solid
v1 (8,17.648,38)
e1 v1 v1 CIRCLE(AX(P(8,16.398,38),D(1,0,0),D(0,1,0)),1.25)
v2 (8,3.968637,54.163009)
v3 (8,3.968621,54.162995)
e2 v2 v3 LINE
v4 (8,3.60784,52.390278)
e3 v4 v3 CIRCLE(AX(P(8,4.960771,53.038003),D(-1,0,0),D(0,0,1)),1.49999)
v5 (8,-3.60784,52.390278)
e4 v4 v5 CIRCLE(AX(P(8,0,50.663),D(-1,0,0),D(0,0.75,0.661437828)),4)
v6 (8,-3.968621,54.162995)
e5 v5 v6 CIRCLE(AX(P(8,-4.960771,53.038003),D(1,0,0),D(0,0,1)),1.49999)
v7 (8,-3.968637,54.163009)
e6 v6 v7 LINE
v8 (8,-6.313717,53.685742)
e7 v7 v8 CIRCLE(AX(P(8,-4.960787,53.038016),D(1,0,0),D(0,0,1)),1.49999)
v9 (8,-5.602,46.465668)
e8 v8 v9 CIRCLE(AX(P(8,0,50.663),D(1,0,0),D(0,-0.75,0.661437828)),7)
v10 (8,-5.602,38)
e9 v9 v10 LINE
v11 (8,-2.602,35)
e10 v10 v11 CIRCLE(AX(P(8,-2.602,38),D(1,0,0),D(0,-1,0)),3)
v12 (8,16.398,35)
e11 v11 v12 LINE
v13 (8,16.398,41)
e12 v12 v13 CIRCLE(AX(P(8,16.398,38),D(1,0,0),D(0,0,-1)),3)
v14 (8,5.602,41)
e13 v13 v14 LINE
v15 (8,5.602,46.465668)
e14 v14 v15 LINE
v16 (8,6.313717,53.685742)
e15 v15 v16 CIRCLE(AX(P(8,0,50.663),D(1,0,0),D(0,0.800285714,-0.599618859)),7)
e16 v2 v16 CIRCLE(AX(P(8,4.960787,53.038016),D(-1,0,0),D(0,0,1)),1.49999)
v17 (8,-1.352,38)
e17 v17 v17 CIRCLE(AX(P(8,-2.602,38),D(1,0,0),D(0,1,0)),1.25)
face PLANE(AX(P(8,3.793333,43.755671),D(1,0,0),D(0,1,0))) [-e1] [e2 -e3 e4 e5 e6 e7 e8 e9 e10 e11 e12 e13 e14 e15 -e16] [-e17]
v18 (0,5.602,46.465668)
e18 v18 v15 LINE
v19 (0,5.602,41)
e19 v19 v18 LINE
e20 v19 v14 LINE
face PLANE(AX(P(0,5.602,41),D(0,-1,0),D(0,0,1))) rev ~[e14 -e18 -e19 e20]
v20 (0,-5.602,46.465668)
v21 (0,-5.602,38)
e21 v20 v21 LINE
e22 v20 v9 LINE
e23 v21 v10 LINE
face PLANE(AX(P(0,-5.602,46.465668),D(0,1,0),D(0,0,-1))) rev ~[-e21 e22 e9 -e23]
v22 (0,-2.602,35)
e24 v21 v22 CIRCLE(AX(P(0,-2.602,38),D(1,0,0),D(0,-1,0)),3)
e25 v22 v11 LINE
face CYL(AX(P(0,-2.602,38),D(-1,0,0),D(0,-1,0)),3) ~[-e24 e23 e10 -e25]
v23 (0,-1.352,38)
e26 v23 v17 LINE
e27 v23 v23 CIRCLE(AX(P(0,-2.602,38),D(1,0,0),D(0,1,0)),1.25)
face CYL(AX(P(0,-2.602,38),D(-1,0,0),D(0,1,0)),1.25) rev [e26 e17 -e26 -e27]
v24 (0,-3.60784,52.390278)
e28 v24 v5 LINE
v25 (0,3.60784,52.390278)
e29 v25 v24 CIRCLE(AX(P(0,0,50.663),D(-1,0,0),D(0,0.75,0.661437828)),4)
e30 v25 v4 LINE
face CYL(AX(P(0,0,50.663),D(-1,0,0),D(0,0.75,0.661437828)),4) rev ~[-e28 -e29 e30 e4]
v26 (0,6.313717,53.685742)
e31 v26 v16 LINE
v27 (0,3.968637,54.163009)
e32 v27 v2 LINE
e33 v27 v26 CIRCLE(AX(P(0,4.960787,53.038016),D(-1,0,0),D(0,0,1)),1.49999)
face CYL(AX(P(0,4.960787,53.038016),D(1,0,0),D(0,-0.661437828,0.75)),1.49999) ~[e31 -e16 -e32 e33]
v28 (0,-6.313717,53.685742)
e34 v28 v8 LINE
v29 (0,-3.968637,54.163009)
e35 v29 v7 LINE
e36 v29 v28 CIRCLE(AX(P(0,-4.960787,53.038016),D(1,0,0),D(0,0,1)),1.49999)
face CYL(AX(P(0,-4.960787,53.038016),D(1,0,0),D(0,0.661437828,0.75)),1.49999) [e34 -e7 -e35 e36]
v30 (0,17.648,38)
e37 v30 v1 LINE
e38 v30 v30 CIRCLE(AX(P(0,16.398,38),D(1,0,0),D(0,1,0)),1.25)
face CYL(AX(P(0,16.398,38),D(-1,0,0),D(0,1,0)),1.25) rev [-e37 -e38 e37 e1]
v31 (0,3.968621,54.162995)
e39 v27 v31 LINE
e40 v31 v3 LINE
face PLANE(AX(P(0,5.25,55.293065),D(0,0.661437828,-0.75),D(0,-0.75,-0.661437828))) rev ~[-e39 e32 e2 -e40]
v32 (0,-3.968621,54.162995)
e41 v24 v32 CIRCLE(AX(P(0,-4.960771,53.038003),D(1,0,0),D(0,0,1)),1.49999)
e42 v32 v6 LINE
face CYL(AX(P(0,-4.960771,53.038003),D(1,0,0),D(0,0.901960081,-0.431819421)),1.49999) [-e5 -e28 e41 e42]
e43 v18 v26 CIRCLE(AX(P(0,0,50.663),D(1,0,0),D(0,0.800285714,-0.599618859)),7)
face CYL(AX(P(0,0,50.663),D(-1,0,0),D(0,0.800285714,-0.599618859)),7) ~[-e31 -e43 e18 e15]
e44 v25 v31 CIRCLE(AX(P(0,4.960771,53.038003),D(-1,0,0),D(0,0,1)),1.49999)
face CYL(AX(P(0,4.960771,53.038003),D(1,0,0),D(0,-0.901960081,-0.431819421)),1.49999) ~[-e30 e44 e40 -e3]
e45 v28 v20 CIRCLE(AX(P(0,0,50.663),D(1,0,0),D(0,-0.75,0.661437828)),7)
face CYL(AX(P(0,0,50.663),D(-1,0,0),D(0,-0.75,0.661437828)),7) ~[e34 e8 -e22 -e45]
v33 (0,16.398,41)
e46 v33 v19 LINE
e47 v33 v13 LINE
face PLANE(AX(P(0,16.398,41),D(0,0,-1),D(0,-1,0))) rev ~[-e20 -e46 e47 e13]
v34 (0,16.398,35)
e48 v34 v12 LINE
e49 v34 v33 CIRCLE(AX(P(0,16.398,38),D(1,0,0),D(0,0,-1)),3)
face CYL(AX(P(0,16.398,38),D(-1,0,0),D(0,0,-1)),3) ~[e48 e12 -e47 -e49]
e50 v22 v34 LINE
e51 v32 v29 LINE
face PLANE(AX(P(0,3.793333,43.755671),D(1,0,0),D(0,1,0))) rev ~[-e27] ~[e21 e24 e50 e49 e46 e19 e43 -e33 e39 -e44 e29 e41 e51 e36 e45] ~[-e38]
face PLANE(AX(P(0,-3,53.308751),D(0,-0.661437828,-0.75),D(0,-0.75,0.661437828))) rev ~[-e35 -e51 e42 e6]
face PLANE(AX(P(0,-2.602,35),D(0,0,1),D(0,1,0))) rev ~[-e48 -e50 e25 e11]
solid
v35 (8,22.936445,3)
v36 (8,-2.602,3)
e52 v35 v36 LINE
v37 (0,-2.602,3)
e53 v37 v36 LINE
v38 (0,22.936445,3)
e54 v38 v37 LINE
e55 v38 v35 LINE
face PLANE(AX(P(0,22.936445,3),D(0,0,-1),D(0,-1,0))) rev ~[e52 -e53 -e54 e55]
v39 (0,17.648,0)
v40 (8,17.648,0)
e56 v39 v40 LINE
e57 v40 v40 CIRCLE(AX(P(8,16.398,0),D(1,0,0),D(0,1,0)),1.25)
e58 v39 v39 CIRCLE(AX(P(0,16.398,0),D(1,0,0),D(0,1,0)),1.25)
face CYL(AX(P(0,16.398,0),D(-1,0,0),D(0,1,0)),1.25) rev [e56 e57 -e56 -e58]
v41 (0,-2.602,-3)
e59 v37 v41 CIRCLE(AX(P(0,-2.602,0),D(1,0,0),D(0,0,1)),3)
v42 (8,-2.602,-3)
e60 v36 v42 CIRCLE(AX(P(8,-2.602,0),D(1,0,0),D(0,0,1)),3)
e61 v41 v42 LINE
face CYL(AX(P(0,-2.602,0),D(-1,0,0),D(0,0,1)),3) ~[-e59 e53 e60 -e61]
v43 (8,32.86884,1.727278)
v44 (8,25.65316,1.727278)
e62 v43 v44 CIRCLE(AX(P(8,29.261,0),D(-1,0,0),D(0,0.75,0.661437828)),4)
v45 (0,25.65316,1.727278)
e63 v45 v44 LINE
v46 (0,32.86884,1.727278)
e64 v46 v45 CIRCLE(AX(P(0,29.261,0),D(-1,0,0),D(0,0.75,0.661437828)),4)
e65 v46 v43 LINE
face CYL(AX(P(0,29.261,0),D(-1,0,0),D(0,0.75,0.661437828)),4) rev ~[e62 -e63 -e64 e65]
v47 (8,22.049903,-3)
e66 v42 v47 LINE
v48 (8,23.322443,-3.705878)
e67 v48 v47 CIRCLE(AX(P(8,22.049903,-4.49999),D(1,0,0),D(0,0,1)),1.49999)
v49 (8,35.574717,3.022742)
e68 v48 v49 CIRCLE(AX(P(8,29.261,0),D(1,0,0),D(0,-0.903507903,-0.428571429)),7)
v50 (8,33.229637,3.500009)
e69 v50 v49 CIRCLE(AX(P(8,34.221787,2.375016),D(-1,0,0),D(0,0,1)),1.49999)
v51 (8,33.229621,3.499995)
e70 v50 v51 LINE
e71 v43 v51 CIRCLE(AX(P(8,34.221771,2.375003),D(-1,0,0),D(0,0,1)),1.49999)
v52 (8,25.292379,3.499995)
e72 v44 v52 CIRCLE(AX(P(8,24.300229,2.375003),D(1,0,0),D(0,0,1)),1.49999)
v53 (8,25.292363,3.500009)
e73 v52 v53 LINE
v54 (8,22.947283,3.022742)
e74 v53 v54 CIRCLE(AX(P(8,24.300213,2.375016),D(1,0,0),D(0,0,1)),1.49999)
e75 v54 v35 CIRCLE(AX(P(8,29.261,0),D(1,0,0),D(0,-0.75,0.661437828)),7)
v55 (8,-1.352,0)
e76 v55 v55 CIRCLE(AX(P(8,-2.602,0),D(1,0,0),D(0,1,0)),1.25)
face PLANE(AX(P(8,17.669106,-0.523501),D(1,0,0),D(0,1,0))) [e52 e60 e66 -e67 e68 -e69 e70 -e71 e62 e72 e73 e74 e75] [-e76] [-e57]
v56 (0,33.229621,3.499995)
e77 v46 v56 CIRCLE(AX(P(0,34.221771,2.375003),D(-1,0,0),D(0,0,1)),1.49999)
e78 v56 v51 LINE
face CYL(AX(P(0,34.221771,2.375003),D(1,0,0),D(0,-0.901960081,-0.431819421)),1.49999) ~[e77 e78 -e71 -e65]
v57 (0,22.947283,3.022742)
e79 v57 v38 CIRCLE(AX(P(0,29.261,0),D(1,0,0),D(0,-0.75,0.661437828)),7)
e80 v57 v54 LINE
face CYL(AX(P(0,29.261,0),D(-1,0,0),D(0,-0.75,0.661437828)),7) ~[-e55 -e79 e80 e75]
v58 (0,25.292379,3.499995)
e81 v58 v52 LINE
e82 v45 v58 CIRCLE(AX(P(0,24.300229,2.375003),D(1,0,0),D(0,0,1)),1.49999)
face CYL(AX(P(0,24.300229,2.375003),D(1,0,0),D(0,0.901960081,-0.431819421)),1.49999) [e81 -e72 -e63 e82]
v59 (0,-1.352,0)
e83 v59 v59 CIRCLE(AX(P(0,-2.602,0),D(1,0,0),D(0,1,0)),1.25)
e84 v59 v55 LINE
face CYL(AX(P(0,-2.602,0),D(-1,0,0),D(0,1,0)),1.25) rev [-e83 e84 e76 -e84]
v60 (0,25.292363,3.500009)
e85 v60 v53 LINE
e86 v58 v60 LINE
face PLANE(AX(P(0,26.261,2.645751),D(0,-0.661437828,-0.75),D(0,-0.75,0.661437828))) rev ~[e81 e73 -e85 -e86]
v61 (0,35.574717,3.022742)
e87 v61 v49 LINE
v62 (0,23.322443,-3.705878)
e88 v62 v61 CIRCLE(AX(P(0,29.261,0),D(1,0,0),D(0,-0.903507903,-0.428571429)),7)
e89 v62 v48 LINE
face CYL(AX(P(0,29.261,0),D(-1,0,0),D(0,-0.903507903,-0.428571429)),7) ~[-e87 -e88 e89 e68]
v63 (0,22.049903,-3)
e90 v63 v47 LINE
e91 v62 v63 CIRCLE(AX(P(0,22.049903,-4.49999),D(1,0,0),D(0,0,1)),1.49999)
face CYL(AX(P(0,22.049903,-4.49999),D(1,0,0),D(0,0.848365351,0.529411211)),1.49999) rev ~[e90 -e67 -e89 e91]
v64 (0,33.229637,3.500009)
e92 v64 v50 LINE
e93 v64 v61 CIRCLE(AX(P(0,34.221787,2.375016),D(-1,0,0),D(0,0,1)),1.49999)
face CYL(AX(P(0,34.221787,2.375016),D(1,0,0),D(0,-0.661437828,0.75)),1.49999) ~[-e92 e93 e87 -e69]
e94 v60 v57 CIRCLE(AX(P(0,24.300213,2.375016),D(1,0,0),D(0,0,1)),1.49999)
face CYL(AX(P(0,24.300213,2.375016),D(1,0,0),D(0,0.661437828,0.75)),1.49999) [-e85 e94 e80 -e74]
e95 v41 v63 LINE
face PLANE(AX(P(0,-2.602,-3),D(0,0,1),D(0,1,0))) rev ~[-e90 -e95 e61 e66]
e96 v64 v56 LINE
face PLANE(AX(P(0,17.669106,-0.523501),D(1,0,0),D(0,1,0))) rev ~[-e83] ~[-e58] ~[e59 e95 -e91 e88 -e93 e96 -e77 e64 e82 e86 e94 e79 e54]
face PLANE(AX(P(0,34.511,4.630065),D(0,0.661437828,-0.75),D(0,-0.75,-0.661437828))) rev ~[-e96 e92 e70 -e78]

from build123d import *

# Parameters (mm, degrees)
F0_R     = 1.25
F1_DEPTH = 8
F2_R     = 1.49999
F3_R     = 1.49999


# Not quite as in the source:
# - a fillet or chamfer is up to 0.001 mm smaller than in the source, because OpenCascade refuses the exact size


with BuildPart() as f1:
    # F0 (on Right) → F1 (new body)
    with BuildSketch(Plane.YZ):
        with BuildLine():
            ThreePointArc((3, 53.3087513111), (0, 46.663), (-3, 53.3087513111))
            Line((-3, 53.3087513111), (-5.25, 55.2930647944))
            ThreePointArc((-5.25, 55.2930647944), (-6.9944413347, 50.9419093324), (-5.602, 46.4656679903))
            Line((-5.602, 46.4656679903), (-5.602, 38))
            ThreePointArc((-5.602, 38), (-4.7233203436, 35.8786796564), (-2.602, 35))
            Line((-2.602, 35), (16.398, 35))
            ThreePointArc((16.398, 35), (19.398, 38), (16.398, 41))
            Line((16.398, 41), (5.602, 41))
            Line((5.602, 41), (5.602, 46.4656679903))
            ThreePointArc((5.602, 46.4656679903), (6.9944413347, 50.9419093324), (5.25, 55.2930647944))
            Line((5.25, 55.2930647944), (3, 53.3087513111))
        make_face()
        with Locations((-2.602, 38)):
            Circle(F0_R, mode=Mode.SUBTRACT)
        with Locations((16.398, 38)):
            Circle(F0_R, mode=Mode.SUBTRACT)
    extrude(amount=F1_DEPTH)

    # F2 (radius 1.5 in the source; OpenCascade refuses exactly that, so slightly less here)
    f2_edges = [f1.edges().sort_by_distance(p)[0] for p in [
        (4, -5.25, 55.293065),
        (4, 5.25, 55.293065),
        (4, -3, 53.308751),
        (4, 3, 53.308751),
    ]]
    fillet(f2_edges, radius=F2_R)


with BuildPart() as f1b:
    # F0 (on Right) → F1, piece 2 (new body)
    with BuildSketch(Plane.YZ):
        with BuildLine():
            ThreePointArc((32.261, 2.6457513111), (29.261, -4), (26.261, 2.6457513111))
            Line((26.261, 2.6457513111), (24.011, 4.6300647944))
            ThreePointArc((24.011, 4.6300647944), (23.4166129043, 3.8526795189), (22.9364446797, 3))
            Line((22.9364446797, 3), (-2.602, 3))
            ThreePointArc((-2.602, 3), (-5.602, 0), (-2.602, -3))
            Line((-2.602, -3), (22.9364446797, -3))
            ThreePointArc((22.9364446797, -3), (33.1136795189, -5.8443870957), (34.511, 4.6300647944))
            Line((34.511, 4.6300647944), (32.261, 2.6457513111))
        make_face()
        with Locations((-2.602, 0)):
            Circle(F0_R, mode=Mode.SUBTRACT)
        with Locations((16.398, 0)):
            Circle(F0_R, mode=Mode.SUBTRACT)
    extrude(amount=F1_DEPTH)

    # F3 (radius 1.5 in the source; OpenCascade refuses exactly that, so slightly less here)
    f3_edges = [f1b.edges().sort_by_distance(p)[0] for p in [
        (4, 32.261, 2.645751),
        (4, 26.261, 2.645751),
        (4, 24.011, 4.630065),
        (4, 34.511, 4.630065),
        (4, 22.936445, -3),
    ]]
    fillet(f3_edges, radius=F3_R)


solid = Compound([f1.part, f1b.part])
